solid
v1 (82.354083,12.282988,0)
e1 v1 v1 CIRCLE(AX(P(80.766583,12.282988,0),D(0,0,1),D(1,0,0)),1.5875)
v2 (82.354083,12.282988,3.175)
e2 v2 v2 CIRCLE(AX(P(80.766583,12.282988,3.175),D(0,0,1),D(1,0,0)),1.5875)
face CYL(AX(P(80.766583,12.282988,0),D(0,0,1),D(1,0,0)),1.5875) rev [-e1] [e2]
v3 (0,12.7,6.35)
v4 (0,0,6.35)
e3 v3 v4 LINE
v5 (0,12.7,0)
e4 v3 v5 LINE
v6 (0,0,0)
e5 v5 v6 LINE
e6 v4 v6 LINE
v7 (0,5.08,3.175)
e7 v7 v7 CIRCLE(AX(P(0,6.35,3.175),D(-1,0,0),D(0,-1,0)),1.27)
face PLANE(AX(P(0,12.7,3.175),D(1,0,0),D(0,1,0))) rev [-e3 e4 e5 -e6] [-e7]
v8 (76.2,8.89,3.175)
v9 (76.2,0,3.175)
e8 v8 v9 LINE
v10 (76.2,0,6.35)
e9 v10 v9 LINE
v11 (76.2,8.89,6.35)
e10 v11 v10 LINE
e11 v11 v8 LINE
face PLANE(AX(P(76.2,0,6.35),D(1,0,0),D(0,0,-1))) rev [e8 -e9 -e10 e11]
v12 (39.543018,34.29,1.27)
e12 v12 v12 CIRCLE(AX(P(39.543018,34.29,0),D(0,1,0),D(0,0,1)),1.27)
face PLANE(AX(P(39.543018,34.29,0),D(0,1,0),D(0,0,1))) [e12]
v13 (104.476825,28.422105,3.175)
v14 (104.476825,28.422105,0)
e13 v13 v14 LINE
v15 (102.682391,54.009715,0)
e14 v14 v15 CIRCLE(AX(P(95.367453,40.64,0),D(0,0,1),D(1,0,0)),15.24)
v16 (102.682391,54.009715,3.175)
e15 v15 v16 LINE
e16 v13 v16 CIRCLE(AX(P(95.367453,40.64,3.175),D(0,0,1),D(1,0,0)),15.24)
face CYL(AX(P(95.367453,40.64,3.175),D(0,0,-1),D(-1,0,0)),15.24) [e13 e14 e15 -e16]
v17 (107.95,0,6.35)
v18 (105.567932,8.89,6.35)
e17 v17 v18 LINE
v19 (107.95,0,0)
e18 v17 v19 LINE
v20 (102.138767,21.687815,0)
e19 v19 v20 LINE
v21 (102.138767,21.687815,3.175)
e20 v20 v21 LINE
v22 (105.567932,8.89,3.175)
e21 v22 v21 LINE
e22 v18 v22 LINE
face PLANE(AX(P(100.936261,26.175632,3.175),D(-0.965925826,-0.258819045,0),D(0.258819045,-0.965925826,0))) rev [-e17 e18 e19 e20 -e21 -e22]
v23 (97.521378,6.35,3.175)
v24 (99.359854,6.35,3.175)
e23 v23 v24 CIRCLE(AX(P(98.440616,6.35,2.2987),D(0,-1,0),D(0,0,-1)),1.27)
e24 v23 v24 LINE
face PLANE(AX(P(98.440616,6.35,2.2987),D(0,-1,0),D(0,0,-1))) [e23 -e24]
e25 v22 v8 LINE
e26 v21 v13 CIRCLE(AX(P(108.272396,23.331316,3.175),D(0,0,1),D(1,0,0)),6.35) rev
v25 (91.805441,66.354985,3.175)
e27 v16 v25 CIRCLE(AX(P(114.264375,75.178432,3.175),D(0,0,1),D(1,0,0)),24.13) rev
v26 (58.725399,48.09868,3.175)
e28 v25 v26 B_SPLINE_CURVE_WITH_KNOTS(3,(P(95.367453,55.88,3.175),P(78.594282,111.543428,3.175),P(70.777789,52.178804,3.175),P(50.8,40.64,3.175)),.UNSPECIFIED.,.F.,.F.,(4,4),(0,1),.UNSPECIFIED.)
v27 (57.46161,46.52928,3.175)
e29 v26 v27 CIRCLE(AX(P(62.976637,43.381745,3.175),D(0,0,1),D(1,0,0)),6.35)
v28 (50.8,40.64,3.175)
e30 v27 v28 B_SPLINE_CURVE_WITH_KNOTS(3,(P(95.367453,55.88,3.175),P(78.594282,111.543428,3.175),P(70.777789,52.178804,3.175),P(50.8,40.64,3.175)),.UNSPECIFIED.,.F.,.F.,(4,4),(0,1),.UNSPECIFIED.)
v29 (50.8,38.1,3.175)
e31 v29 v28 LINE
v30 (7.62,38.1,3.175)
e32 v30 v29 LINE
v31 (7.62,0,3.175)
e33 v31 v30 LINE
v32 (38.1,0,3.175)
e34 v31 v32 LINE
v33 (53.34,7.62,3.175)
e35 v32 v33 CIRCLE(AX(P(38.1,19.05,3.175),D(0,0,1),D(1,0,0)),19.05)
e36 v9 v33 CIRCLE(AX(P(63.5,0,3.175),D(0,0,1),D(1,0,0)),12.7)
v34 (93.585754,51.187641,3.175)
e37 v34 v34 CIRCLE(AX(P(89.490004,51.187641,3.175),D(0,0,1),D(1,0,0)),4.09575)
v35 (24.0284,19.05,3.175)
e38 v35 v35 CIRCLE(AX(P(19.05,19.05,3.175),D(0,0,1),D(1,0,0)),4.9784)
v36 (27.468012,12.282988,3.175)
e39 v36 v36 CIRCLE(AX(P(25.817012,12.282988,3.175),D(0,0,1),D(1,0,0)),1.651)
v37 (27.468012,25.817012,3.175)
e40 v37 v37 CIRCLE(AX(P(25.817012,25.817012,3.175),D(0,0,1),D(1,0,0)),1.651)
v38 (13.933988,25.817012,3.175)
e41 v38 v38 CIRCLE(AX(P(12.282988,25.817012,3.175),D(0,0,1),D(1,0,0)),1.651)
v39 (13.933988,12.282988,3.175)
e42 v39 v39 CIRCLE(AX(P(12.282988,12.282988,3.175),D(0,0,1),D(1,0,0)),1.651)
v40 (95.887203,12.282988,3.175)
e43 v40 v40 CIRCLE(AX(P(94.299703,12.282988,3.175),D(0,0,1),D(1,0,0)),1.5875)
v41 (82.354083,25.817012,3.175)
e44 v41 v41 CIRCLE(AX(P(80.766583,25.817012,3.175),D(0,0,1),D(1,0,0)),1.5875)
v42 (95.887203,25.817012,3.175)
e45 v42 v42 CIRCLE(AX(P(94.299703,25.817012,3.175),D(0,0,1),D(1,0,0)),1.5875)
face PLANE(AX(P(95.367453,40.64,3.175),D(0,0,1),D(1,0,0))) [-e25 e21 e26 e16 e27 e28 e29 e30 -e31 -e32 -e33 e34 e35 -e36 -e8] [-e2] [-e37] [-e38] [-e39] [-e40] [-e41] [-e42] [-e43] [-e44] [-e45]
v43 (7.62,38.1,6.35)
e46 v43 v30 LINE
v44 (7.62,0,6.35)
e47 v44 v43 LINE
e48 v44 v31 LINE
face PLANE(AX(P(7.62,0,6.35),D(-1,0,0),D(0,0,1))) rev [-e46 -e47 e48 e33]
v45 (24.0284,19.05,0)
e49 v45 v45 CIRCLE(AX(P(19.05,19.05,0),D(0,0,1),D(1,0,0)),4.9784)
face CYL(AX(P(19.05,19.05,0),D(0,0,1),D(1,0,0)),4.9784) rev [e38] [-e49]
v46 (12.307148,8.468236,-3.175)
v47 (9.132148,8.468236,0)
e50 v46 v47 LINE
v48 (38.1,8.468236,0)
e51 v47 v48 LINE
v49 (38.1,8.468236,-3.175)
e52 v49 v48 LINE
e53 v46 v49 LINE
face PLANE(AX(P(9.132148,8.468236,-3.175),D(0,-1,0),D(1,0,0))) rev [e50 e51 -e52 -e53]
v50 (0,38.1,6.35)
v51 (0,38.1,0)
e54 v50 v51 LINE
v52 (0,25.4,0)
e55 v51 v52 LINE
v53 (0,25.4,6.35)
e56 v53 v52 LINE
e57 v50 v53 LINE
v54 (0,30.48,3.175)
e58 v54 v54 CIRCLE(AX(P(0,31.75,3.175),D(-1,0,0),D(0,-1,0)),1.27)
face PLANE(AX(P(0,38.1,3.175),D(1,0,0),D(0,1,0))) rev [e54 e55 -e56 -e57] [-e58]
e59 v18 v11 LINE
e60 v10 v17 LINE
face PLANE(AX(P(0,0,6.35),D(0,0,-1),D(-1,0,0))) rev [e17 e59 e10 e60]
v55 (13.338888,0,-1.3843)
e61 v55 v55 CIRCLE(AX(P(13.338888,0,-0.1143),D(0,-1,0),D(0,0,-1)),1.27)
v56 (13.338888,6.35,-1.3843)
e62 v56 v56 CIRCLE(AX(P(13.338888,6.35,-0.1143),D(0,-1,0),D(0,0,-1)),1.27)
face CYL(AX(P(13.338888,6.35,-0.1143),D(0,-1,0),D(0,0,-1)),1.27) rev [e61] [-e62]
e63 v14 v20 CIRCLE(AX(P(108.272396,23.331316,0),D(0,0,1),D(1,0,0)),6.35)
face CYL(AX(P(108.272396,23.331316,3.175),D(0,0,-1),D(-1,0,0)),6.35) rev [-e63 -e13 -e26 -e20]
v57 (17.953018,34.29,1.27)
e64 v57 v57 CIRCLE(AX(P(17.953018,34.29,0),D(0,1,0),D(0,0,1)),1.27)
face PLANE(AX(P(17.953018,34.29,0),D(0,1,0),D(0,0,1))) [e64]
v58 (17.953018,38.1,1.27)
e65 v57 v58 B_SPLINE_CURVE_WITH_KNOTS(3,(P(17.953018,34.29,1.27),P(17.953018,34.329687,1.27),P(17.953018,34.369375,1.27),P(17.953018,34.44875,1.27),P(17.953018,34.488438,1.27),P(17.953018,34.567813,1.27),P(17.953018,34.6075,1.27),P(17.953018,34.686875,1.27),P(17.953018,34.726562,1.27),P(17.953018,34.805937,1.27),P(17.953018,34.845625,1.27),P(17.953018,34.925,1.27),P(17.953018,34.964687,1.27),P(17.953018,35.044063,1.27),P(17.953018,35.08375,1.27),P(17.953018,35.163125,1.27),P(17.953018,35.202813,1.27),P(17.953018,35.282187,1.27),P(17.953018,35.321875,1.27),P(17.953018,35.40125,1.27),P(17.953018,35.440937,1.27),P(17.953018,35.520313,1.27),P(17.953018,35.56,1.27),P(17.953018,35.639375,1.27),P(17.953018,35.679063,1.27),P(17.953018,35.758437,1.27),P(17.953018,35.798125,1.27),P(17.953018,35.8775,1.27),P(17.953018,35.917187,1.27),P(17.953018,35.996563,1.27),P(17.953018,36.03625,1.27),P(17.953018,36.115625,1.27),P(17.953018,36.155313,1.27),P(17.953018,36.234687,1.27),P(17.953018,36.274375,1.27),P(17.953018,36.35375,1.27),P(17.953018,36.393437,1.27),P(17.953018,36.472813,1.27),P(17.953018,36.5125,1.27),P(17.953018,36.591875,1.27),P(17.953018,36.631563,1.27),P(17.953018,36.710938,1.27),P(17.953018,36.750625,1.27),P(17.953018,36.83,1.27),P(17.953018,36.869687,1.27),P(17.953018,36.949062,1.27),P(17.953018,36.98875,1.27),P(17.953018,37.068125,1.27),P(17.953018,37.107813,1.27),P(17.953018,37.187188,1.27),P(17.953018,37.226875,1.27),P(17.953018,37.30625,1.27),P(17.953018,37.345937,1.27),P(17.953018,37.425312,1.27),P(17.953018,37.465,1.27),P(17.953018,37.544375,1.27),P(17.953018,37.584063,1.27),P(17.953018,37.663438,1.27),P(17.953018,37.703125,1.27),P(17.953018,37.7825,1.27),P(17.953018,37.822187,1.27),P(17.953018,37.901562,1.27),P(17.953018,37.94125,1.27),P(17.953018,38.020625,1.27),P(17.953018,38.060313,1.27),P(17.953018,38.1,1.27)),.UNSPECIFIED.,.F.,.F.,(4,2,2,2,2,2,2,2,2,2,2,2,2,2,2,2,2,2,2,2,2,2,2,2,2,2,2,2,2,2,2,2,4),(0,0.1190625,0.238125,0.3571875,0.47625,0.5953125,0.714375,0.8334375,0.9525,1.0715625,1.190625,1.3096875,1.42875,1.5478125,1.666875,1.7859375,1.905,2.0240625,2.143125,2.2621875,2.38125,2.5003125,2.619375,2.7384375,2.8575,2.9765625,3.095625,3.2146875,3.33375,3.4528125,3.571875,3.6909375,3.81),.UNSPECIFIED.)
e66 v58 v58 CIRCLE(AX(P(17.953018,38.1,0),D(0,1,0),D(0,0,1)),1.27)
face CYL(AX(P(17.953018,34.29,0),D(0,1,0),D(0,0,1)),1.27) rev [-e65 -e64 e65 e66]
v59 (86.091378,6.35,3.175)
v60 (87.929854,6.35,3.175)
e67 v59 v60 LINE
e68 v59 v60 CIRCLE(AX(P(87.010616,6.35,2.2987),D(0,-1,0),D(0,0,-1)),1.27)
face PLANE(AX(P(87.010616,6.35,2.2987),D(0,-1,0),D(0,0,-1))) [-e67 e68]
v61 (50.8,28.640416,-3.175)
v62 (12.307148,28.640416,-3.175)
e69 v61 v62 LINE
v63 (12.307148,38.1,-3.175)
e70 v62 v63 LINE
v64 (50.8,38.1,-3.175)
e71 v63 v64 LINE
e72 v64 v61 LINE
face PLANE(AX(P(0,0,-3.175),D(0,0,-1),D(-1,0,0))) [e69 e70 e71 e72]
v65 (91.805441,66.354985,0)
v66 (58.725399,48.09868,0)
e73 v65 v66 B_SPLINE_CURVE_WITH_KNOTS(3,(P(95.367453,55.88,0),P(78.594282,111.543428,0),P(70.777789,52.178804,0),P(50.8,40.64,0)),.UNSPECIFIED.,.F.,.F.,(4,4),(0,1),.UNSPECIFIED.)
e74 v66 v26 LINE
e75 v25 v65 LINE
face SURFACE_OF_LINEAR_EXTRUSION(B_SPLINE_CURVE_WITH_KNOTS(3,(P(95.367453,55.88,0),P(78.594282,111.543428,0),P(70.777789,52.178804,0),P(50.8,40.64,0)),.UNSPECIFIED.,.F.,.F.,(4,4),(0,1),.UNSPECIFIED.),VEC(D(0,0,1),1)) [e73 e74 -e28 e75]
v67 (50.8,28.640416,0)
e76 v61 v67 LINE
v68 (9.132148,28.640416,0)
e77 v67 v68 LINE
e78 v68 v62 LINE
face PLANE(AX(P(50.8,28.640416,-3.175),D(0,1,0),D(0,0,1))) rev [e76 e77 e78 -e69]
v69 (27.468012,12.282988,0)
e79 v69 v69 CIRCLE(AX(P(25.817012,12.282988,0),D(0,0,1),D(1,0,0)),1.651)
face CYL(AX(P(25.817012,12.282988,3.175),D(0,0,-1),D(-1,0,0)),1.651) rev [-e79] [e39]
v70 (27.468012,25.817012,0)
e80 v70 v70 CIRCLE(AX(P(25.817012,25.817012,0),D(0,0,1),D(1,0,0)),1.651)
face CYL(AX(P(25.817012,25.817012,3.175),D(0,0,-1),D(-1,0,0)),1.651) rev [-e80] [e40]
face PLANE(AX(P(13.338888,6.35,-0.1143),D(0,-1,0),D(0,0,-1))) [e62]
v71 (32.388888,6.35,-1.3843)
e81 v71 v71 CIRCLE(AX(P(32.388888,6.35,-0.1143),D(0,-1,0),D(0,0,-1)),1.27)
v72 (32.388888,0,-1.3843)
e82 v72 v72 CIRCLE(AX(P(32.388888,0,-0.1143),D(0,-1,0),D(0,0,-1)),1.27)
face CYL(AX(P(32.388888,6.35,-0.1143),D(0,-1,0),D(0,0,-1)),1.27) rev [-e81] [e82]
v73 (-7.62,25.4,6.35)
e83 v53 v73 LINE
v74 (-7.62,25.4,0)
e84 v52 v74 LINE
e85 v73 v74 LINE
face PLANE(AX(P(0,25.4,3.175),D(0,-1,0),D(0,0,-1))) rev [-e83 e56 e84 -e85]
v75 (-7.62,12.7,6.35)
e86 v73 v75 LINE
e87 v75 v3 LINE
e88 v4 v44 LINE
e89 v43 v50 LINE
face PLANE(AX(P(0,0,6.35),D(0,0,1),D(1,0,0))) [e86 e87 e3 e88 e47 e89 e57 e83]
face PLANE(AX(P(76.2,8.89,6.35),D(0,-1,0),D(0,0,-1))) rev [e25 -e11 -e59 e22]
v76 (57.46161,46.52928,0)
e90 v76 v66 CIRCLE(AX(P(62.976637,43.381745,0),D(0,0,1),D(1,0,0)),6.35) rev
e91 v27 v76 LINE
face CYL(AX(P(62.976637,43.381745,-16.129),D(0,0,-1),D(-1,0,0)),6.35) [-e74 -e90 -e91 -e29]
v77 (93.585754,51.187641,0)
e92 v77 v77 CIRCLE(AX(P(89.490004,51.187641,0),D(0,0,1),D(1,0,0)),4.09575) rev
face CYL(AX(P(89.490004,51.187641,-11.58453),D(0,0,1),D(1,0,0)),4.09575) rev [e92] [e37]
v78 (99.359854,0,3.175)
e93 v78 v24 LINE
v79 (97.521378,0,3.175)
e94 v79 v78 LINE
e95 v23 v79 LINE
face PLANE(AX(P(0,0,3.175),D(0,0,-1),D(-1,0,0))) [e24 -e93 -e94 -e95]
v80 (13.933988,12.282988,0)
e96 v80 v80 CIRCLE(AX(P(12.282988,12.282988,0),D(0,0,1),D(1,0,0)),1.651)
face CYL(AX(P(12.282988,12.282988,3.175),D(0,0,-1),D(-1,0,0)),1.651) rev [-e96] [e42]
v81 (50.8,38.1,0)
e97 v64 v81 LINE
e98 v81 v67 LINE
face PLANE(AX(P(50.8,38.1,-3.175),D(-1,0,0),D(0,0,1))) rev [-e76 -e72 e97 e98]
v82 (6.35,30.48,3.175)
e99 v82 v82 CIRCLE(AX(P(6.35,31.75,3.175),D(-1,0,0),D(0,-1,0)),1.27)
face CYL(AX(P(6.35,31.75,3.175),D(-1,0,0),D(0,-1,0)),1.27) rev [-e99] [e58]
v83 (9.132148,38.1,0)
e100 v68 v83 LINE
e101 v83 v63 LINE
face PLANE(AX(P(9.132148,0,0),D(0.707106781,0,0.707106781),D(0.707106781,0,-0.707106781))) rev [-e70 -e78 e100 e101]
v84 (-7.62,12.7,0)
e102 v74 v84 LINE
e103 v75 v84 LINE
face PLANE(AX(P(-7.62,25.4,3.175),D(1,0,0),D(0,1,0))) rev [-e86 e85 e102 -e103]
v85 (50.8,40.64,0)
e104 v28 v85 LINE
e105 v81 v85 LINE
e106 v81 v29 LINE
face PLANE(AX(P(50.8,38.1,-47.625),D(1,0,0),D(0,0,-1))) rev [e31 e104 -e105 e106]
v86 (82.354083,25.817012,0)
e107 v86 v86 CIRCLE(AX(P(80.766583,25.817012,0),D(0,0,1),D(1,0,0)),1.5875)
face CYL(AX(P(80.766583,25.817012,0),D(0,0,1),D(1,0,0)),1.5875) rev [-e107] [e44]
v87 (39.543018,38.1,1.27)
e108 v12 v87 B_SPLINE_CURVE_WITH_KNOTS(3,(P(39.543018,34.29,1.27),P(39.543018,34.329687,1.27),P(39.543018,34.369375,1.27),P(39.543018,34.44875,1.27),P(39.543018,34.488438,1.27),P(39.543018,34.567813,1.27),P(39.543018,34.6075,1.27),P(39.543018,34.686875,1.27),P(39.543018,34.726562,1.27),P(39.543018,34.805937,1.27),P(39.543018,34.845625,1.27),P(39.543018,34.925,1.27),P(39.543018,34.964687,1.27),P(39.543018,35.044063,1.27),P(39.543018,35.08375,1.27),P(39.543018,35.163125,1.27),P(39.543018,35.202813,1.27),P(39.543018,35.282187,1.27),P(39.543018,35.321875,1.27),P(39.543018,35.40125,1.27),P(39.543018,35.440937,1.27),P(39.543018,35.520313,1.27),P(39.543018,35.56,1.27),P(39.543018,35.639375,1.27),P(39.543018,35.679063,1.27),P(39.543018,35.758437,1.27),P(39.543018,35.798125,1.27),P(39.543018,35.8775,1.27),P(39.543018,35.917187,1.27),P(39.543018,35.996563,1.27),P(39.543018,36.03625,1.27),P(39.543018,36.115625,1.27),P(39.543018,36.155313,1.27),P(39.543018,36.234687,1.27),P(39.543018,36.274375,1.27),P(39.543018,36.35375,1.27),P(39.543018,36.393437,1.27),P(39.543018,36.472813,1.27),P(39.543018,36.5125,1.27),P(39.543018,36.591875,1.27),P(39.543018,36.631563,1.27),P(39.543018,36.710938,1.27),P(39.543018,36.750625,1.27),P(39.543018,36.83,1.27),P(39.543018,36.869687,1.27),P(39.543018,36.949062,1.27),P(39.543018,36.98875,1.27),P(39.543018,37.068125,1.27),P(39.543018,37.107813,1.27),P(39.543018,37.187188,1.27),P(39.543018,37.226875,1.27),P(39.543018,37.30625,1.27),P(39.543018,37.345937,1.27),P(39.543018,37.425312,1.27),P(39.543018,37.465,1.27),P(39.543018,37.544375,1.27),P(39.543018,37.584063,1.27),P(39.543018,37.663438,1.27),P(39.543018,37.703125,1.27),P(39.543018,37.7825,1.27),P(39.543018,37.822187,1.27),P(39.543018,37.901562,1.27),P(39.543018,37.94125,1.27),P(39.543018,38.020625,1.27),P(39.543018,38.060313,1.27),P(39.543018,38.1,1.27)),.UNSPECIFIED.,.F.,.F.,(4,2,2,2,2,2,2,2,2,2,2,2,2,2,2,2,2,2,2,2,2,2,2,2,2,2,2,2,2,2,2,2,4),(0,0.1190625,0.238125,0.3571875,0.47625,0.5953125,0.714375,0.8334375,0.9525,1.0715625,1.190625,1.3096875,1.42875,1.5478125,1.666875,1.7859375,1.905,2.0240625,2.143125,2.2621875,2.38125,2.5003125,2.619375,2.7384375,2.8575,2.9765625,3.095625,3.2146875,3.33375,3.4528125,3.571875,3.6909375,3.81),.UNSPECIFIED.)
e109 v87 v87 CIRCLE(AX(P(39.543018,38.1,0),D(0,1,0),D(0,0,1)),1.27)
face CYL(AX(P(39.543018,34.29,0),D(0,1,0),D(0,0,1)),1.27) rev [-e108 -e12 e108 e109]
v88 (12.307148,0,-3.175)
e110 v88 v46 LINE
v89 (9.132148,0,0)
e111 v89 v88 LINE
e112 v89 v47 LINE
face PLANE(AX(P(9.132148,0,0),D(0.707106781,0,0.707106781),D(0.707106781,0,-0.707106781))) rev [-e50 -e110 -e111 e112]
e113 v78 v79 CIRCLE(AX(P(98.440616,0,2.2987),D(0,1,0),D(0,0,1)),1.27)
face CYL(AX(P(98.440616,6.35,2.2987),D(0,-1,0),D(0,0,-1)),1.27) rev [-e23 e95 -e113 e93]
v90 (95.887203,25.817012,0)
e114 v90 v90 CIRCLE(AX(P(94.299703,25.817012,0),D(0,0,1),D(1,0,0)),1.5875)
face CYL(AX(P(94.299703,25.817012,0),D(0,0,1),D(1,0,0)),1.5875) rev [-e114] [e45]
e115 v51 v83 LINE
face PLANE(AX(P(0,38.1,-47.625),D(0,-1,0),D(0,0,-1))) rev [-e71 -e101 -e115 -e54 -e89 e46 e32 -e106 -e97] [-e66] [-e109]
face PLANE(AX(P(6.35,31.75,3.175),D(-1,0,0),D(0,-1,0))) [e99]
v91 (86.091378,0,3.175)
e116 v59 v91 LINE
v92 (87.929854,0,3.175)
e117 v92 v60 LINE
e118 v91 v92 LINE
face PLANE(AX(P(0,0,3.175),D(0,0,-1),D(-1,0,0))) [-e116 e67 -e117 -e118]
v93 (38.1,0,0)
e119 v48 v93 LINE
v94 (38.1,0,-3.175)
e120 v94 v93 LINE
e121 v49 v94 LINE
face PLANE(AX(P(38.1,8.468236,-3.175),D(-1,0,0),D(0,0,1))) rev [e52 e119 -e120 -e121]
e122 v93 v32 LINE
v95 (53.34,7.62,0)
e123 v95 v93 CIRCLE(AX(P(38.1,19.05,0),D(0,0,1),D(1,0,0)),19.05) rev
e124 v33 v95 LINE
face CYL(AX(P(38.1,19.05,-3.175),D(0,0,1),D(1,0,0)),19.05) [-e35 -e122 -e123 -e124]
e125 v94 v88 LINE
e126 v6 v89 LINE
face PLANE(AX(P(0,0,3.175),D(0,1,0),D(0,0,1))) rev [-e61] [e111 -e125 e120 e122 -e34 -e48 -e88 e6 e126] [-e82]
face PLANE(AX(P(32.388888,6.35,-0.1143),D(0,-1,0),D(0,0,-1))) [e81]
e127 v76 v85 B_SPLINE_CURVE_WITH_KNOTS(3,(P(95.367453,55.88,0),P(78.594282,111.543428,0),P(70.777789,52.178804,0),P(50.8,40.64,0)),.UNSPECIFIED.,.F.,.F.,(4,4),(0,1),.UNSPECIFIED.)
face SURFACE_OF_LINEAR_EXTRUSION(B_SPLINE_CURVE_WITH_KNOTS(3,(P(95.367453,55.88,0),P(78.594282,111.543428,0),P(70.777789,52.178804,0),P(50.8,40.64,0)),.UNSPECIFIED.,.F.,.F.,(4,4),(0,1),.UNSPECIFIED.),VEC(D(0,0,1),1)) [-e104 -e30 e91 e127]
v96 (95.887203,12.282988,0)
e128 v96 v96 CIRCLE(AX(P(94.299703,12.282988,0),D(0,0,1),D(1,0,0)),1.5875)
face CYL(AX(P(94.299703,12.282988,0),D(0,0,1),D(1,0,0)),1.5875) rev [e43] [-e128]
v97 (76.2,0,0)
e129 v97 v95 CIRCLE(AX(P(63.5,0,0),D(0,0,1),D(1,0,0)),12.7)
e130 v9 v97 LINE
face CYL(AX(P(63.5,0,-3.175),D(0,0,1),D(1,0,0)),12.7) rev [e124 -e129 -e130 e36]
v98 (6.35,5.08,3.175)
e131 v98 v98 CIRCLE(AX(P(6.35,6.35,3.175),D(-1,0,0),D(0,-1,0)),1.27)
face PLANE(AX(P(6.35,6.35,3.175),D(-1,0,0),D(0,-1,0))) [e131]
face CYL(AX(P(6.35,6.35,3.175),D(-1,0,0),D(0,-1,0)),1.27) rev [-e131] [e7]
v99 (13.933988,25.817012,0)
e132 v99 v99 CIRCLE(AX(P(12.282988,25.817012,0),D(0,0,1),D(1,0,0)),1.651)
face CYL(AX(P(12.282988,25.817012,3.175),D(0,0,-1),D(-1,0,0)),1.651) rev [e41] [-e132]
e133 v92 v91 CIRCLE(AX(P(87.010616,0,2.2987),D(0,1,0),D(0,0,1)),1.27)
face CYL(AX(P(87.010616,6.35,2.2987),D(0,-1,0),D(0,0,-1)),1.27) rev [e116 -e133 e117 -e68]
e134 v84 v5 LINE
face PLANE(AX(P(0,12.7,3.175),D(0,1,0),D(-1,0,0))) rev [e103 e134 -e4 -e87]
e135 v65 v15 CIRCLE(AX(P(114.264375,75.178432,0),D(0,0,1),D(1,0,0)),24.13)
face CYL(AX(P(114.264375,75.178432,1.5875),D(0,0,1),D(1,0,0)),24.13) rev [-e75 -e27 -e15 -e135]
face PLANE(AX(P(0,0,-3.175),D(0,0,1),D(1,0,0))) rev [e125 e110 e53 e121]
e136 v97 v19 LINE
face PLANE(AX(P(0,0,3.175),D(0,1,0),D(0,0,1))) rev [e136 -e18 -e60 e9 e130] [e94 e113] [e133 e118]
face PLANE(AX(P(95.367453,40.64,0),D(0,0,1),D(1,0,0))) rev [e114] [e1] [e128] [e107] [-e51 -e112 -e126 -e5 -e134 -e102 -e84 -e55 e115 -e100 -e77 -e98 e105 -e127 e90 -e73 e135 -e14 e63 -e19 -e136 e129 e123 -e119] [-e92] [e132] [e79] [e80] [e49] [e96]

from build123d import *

# Parameters (mm, degrees)
SKETCH1_R           = 1.651
BOSS_EXTRUDE1_DEPTH = 3.175
CUT_EXTRUDE2_DEPTH  = 6.35
SKETCH7_R           = 4.9784
SKETCH7_R_2         = 1.5875
CUT_EXTRUDE3_DEPTH  = 124.96234811
FILLET1_R           = 6.35
SKETCH8_W           = 50.8
SKETCH8_H           = 12.7
CUT_EXTRUDE4_DEPTH  = 50.8
CUT_EXTRUDE5_DEPTH  = 19.304
FILLET6_R           = 6.35
FILLET7_R           = 6.35
FILLET8_R           = 19.05
BOSS_EXTRUDE2_DEPTH = 3.175
FILLET9_R           = 24.13
SKETCH13_W          = 41.667851519
SKETCH13_H          = 9.459584315
SKETCH13_W_2        = 28.967851519
SKETCH13_H_2        = 8.468235606
BOSS_EXTRUDE3_DEPTH = 3.175
BOSS_EXTRUDE4_DEPTH = 3.175
CUT_EXTRUDE9_DEPTH  = 119.214793194
SKETCH20_R          = 1.27
CUT_EXTRUDE10_DEPTH = 3.81
SKETCH21_R          = 1.27
CUT_EXTRUDE11_DEPTH = 6.35
SKETCH22_R          = 1.27
CUT_EXTRUDE12_DEPTH = 6.35
BOSS_EXTRUDE5_DEPTH = 3.175
SKETCH24_R          = 4.09575
CUT_EXTRUDE13_DEPTH = 3.175


with BuildPart() as part:
    # Sketch1 → Boss-Extrude1 (new body)
    with BuildSketch(Plane.XY):
        with BuildLine():
            Line((0, 0), (107.95, 0))
            Line((107.95, 0), (100.9362606, 26.175631792))
            Line((100.9362606, 26.175631792), (100.868755024, 26.427566033))
            ThreePointArc((100.868755024, 26.427566033), (110.348359368, 43.438223217), (95.367453293, 55.88))
            Line((95.367453293, 55.88), (0, 38.1))
            Line((0, 38.1), (0, 25.4))
            Line((0, 25.4), (-7.62, 25.4))
            Line((-7.62, 25.4), (-7.62, 12.7))
            Line((-7.62, 12.7), (0, 12.7))
            Line((0, 12.7), (0, 0))
        make_face()
        with Locations((25.817011896, 25.817011896)):
            Circle(SKETCH1_R, mode=Mode.SUBTRACT)
        with Locations((25.817011896, 12.282988104)):
            Circle(SKETCH1_R, mode=Mode.SUBTRACT)
        with Locations((12.282988104, 12.282988104)):
            Circle(SKETCH1_R, mode=Mode.SUBTRACT)
        with Locations((12.282988104, 25.817011896)):
            Circle(SKETCH1_R, mode=Mode.SUBTRACT)
    extrude(amount=BOSS_EXTRUDE1_DEPTH)

    # Sketch6 → Cut-Extrude2 (cut)
    with BuildSketch(Plane.XY.offset(3.175)):
        with BuildLine():
            Line((50.8, 0), (76.2, 0))
            ThreePointArc((76.2, 0), (63.5, 12.7), (50.8, 0))
        make_face()
    extrude(amount=-CUT_EXTRUDE2_DEPTH, mode=Mode.SUBTRACT)

    # Sketch7 → Cut-Extrude3 (cut, through all)
    with BuildSketch(Plane.XY.offset(3.175)):
        with Locations((19.05, 19.05)):
            Circle(SKETCH7_R)
        with Locations((80.766582748, 12.282988104)):
            Circle(SKETCH7_R_2)
        with Locations((94.299702748, 12.282988104)):
            Circle(SKETCH7_R_2)
        with Locations((80.766582748, 25.817011896)):
            Circle(SKETCH7_R_2)
        with Locations((94.299702748, 25.817011896)):
            Circle(SKETCH7_R_2)
    extrude(amount=-CUT_EXTRUDE3_DEPTH, mode=Mode.SUBTRACT)

    # Fillet1
    fillet1_edges = [part.edges().sort_by_distance(p)[0] for p in [
        (100.868755024, 26.427566033, 1.5875),
    ]]
    fillet(fillet1_edges, radius=FILLET1_R)

    # Sketch8 → Cut-Extrude4 (cut)
    with BuildSketch(Plane.XY.offset(3.175)):
        with Locations((25.4, 44.45)):
            Rectangle(SKETCH8_W, SKETCH8_H)
    extrude(amount=-CUT_EXTRUDE4_DEPTH, mode=Mode.SUBTRACT)

    # Sketch9 → Cut-Extrude5 (cut)
    with BuildSketch(Plane.XY.offset(3.175)):
        Polygon((50.8, 47.57098794), (50.8, 40.64), (57.15, 40.64), (57.15, 48.754861432), align=None)
    extrude(amount=-CUT_EXTRUDE5_DEPTH, mode=Mode.SUBTRACT)

    # Fillet6
    fillet6_edges = [part.edges().sort_by_distance(p)[0] for p in [
        (57.15, 40.64, 1.5875),
    ]]
    fillet(fillet6_edges, radius=FILLET6_R - 0.0001)  # a hair under: the kernel refuses the full size

    # Fillet7
    fillet7_edges = [part.edges().sort_by_distance(p)[0] for p in [
        (57.15, 48.754861432, 1.5875),
    ]]
    fillet(fillet7_edges, radius=FILLET7_R)

    # Fillet8
    fillet8_edges = [part.edges().sort_by_distance(p)[0] for p in [
        (50.8, 0, 1.5875),
    ]]
    fillet(fillet8_edges, radius=FILLET8_R)

    # Sketch12 → Boss-Extrude2 (add)
    with BuildSketch(Plane.XY.offset(3.175)):
        with BuildLine():
            Line((50.8, 40.64), (85.027112904, 40.64))
            Line((85.027112904, 40.64), (95.367453293, 55.88))
            add(Edge.make_bspline(
                [(50.8, 40.64), (70.777788932, 52.178803671), (78.594281742, 111.543427795), (95.367453293, 55.88)],
                knots=[0, 0, 0, 0, 1, 1, 1, 1], degree=3))
        make_face()
    extrude(amount=-BOSS_EXTRUDE2_DEPTH)

    # Fillet9
    fillet9_edges = [part.edges().sort_by_distance(p)[0] for p in [
        (95.367453293, 55.88, 1.5875),
    ]]
    fillet(fillet9_edges, radius=FILLET9_R)

    # Sketch13 → Boss-Extrude3 (add)
    with BuildSketch(Plane(origin=(0, 0, 0), x_dir=(-1, 0, 0), z_dir=(0, 0, -1))):
        with Locations((-29.966074241, 33.370207843)):
            Rectangle(SKETCH13_W, SKETCH13_H)
        with Locations((-23.616074241, 4.234117803)):
            Rectangle(SKETCH13_W_2, SKETCH13_H_2)
    extrude(amount=BOSS_EXTRUDE3_DEPTH)

    # Sketch18 → Boss-Extrude4 (add)
    with BuildSketch(Plane.XY.offset(3.175)):
        Polygon((0, 0), (7.62, 0), (7.62, 38.1), (0, 38.1), (0, 25.4), (-7.62, 25.4), (-7.62, 12.7), (0, 12.7), align=None)
    extrude(amount=BOSS_EXTRUDE4_DEPTH)

    # Sketch19 → Cut-Extrude9 (cut, through all)
    with BuildSketch(Plane(origin=(0, 38.1, 0), x_dir=(1, 0, 0), z_dir=(0, 1, 0))):
        Polygon((9.132148481, 0), (12.307148481, 3.175), (9.132148481, 3.175), align=None)
    extrude(amount=-CUT_EXTRUDE9_DEPTH, mode=Mode.SUBTRACT)

    # Sketch20 → Cut-Extrude10 (cut)
    with BuildSketch(Plane(origin=(18.309536053, 38.1, -53.667404751), x_dir=(0.9999106684671757, 0, -0.013366191885729645), z_dir=(0, 1, 0))):
        with Locations(Location((-1.073815344, -53.657845266, 0), (0, 0, 269.234150812))):
            Circle(SKETCH20_R)
        with Locations(Location((20.514255988, -53.946421349, 0), (0, 0, 269.234150812))):
            Circle(SKETCH20_R)
    extrude(amount=-CUT_EXTRUDE10_DEPTH, mode=Mode.SUBTRACT)

    # Sketch21 → Cut-Extrude11 (cut)
    with BuildSketch(Plane(origin=(0, -69.83828079, -53.667404751), x_dir=(0, 0.0318826428364363, 0.9994916193174229), z_dir=(-1, 0, 0))):
        with Locations(Location((59.242590915, 74.337262051, 0), (0, 0, 268.172949503))):
            Circle(SKETCH21_R)
        with Locations(Location((60.052410043, 99.724349182, 0), (0, 0, 268.172949503))):
            Circle(SKETCH21_R)
    extrude(amount=-CUT_EXTRUDE11_DEPTH, mode=Mode.SUBTRACT)

    # Sketch22 → Cut-Extrude12 (cut)
    with BuildSketch(Plane(origin=(18.309536053, 0, -53.667404751), x_dir=(0.9999106684671757, 0, -0.013366191885729645), z_dir=(0, -1, 0))):
        with Locations(Location((-5.686004931, 53.481882136, 0), (0, 0, 270.765849188))):
            Circle(SKETCH22_R)
        with Locations(Location((13.362293303, 53.736508092, 0), (0, 0, 270.765849188))):
            Circle(SKETCH22_R)
        with Locations((67.946889168, 56.879377031)):
            Circle(SKETCH22_R)
        with Locations((79.375868109, 57.032152605)):
            Circle(SKETCH22_R)
    extrude(amount=-CUT_EXTRUDE12_DEPTH, mode=Mode.SUBTRACT)

    # Sketch23 → Boss-Extrude5 (add)
    with BuildSketch(Plane.XY.offset(3.175)):
        Polygon((76.2, 0), (76.2, 8.89), (105.567931679, 8.89), (107.95, 0), align=None)
    extrude(amount=BOSS_EXTRUDE5_DEPTH)

    # Sketch24 → Cut-Extrude13 (cut)
    with BuildSketch(Plane(origin=(18.309536053, -69.83828079, 3.175), x_dir=(0.9998147472374107, 0.019247628596600598, 0), z_dir=(0, 0, 1))):
        with Locations(Location((73.496743516, 119.633445733, 0), (0, 0, 358.897124011))):
            Circle(SKETCH24_R)
    extrude(amount=-CUT_EXTRUDE13_DEPTH, mode=Mode.SUBTRACT)


solid = part.part
